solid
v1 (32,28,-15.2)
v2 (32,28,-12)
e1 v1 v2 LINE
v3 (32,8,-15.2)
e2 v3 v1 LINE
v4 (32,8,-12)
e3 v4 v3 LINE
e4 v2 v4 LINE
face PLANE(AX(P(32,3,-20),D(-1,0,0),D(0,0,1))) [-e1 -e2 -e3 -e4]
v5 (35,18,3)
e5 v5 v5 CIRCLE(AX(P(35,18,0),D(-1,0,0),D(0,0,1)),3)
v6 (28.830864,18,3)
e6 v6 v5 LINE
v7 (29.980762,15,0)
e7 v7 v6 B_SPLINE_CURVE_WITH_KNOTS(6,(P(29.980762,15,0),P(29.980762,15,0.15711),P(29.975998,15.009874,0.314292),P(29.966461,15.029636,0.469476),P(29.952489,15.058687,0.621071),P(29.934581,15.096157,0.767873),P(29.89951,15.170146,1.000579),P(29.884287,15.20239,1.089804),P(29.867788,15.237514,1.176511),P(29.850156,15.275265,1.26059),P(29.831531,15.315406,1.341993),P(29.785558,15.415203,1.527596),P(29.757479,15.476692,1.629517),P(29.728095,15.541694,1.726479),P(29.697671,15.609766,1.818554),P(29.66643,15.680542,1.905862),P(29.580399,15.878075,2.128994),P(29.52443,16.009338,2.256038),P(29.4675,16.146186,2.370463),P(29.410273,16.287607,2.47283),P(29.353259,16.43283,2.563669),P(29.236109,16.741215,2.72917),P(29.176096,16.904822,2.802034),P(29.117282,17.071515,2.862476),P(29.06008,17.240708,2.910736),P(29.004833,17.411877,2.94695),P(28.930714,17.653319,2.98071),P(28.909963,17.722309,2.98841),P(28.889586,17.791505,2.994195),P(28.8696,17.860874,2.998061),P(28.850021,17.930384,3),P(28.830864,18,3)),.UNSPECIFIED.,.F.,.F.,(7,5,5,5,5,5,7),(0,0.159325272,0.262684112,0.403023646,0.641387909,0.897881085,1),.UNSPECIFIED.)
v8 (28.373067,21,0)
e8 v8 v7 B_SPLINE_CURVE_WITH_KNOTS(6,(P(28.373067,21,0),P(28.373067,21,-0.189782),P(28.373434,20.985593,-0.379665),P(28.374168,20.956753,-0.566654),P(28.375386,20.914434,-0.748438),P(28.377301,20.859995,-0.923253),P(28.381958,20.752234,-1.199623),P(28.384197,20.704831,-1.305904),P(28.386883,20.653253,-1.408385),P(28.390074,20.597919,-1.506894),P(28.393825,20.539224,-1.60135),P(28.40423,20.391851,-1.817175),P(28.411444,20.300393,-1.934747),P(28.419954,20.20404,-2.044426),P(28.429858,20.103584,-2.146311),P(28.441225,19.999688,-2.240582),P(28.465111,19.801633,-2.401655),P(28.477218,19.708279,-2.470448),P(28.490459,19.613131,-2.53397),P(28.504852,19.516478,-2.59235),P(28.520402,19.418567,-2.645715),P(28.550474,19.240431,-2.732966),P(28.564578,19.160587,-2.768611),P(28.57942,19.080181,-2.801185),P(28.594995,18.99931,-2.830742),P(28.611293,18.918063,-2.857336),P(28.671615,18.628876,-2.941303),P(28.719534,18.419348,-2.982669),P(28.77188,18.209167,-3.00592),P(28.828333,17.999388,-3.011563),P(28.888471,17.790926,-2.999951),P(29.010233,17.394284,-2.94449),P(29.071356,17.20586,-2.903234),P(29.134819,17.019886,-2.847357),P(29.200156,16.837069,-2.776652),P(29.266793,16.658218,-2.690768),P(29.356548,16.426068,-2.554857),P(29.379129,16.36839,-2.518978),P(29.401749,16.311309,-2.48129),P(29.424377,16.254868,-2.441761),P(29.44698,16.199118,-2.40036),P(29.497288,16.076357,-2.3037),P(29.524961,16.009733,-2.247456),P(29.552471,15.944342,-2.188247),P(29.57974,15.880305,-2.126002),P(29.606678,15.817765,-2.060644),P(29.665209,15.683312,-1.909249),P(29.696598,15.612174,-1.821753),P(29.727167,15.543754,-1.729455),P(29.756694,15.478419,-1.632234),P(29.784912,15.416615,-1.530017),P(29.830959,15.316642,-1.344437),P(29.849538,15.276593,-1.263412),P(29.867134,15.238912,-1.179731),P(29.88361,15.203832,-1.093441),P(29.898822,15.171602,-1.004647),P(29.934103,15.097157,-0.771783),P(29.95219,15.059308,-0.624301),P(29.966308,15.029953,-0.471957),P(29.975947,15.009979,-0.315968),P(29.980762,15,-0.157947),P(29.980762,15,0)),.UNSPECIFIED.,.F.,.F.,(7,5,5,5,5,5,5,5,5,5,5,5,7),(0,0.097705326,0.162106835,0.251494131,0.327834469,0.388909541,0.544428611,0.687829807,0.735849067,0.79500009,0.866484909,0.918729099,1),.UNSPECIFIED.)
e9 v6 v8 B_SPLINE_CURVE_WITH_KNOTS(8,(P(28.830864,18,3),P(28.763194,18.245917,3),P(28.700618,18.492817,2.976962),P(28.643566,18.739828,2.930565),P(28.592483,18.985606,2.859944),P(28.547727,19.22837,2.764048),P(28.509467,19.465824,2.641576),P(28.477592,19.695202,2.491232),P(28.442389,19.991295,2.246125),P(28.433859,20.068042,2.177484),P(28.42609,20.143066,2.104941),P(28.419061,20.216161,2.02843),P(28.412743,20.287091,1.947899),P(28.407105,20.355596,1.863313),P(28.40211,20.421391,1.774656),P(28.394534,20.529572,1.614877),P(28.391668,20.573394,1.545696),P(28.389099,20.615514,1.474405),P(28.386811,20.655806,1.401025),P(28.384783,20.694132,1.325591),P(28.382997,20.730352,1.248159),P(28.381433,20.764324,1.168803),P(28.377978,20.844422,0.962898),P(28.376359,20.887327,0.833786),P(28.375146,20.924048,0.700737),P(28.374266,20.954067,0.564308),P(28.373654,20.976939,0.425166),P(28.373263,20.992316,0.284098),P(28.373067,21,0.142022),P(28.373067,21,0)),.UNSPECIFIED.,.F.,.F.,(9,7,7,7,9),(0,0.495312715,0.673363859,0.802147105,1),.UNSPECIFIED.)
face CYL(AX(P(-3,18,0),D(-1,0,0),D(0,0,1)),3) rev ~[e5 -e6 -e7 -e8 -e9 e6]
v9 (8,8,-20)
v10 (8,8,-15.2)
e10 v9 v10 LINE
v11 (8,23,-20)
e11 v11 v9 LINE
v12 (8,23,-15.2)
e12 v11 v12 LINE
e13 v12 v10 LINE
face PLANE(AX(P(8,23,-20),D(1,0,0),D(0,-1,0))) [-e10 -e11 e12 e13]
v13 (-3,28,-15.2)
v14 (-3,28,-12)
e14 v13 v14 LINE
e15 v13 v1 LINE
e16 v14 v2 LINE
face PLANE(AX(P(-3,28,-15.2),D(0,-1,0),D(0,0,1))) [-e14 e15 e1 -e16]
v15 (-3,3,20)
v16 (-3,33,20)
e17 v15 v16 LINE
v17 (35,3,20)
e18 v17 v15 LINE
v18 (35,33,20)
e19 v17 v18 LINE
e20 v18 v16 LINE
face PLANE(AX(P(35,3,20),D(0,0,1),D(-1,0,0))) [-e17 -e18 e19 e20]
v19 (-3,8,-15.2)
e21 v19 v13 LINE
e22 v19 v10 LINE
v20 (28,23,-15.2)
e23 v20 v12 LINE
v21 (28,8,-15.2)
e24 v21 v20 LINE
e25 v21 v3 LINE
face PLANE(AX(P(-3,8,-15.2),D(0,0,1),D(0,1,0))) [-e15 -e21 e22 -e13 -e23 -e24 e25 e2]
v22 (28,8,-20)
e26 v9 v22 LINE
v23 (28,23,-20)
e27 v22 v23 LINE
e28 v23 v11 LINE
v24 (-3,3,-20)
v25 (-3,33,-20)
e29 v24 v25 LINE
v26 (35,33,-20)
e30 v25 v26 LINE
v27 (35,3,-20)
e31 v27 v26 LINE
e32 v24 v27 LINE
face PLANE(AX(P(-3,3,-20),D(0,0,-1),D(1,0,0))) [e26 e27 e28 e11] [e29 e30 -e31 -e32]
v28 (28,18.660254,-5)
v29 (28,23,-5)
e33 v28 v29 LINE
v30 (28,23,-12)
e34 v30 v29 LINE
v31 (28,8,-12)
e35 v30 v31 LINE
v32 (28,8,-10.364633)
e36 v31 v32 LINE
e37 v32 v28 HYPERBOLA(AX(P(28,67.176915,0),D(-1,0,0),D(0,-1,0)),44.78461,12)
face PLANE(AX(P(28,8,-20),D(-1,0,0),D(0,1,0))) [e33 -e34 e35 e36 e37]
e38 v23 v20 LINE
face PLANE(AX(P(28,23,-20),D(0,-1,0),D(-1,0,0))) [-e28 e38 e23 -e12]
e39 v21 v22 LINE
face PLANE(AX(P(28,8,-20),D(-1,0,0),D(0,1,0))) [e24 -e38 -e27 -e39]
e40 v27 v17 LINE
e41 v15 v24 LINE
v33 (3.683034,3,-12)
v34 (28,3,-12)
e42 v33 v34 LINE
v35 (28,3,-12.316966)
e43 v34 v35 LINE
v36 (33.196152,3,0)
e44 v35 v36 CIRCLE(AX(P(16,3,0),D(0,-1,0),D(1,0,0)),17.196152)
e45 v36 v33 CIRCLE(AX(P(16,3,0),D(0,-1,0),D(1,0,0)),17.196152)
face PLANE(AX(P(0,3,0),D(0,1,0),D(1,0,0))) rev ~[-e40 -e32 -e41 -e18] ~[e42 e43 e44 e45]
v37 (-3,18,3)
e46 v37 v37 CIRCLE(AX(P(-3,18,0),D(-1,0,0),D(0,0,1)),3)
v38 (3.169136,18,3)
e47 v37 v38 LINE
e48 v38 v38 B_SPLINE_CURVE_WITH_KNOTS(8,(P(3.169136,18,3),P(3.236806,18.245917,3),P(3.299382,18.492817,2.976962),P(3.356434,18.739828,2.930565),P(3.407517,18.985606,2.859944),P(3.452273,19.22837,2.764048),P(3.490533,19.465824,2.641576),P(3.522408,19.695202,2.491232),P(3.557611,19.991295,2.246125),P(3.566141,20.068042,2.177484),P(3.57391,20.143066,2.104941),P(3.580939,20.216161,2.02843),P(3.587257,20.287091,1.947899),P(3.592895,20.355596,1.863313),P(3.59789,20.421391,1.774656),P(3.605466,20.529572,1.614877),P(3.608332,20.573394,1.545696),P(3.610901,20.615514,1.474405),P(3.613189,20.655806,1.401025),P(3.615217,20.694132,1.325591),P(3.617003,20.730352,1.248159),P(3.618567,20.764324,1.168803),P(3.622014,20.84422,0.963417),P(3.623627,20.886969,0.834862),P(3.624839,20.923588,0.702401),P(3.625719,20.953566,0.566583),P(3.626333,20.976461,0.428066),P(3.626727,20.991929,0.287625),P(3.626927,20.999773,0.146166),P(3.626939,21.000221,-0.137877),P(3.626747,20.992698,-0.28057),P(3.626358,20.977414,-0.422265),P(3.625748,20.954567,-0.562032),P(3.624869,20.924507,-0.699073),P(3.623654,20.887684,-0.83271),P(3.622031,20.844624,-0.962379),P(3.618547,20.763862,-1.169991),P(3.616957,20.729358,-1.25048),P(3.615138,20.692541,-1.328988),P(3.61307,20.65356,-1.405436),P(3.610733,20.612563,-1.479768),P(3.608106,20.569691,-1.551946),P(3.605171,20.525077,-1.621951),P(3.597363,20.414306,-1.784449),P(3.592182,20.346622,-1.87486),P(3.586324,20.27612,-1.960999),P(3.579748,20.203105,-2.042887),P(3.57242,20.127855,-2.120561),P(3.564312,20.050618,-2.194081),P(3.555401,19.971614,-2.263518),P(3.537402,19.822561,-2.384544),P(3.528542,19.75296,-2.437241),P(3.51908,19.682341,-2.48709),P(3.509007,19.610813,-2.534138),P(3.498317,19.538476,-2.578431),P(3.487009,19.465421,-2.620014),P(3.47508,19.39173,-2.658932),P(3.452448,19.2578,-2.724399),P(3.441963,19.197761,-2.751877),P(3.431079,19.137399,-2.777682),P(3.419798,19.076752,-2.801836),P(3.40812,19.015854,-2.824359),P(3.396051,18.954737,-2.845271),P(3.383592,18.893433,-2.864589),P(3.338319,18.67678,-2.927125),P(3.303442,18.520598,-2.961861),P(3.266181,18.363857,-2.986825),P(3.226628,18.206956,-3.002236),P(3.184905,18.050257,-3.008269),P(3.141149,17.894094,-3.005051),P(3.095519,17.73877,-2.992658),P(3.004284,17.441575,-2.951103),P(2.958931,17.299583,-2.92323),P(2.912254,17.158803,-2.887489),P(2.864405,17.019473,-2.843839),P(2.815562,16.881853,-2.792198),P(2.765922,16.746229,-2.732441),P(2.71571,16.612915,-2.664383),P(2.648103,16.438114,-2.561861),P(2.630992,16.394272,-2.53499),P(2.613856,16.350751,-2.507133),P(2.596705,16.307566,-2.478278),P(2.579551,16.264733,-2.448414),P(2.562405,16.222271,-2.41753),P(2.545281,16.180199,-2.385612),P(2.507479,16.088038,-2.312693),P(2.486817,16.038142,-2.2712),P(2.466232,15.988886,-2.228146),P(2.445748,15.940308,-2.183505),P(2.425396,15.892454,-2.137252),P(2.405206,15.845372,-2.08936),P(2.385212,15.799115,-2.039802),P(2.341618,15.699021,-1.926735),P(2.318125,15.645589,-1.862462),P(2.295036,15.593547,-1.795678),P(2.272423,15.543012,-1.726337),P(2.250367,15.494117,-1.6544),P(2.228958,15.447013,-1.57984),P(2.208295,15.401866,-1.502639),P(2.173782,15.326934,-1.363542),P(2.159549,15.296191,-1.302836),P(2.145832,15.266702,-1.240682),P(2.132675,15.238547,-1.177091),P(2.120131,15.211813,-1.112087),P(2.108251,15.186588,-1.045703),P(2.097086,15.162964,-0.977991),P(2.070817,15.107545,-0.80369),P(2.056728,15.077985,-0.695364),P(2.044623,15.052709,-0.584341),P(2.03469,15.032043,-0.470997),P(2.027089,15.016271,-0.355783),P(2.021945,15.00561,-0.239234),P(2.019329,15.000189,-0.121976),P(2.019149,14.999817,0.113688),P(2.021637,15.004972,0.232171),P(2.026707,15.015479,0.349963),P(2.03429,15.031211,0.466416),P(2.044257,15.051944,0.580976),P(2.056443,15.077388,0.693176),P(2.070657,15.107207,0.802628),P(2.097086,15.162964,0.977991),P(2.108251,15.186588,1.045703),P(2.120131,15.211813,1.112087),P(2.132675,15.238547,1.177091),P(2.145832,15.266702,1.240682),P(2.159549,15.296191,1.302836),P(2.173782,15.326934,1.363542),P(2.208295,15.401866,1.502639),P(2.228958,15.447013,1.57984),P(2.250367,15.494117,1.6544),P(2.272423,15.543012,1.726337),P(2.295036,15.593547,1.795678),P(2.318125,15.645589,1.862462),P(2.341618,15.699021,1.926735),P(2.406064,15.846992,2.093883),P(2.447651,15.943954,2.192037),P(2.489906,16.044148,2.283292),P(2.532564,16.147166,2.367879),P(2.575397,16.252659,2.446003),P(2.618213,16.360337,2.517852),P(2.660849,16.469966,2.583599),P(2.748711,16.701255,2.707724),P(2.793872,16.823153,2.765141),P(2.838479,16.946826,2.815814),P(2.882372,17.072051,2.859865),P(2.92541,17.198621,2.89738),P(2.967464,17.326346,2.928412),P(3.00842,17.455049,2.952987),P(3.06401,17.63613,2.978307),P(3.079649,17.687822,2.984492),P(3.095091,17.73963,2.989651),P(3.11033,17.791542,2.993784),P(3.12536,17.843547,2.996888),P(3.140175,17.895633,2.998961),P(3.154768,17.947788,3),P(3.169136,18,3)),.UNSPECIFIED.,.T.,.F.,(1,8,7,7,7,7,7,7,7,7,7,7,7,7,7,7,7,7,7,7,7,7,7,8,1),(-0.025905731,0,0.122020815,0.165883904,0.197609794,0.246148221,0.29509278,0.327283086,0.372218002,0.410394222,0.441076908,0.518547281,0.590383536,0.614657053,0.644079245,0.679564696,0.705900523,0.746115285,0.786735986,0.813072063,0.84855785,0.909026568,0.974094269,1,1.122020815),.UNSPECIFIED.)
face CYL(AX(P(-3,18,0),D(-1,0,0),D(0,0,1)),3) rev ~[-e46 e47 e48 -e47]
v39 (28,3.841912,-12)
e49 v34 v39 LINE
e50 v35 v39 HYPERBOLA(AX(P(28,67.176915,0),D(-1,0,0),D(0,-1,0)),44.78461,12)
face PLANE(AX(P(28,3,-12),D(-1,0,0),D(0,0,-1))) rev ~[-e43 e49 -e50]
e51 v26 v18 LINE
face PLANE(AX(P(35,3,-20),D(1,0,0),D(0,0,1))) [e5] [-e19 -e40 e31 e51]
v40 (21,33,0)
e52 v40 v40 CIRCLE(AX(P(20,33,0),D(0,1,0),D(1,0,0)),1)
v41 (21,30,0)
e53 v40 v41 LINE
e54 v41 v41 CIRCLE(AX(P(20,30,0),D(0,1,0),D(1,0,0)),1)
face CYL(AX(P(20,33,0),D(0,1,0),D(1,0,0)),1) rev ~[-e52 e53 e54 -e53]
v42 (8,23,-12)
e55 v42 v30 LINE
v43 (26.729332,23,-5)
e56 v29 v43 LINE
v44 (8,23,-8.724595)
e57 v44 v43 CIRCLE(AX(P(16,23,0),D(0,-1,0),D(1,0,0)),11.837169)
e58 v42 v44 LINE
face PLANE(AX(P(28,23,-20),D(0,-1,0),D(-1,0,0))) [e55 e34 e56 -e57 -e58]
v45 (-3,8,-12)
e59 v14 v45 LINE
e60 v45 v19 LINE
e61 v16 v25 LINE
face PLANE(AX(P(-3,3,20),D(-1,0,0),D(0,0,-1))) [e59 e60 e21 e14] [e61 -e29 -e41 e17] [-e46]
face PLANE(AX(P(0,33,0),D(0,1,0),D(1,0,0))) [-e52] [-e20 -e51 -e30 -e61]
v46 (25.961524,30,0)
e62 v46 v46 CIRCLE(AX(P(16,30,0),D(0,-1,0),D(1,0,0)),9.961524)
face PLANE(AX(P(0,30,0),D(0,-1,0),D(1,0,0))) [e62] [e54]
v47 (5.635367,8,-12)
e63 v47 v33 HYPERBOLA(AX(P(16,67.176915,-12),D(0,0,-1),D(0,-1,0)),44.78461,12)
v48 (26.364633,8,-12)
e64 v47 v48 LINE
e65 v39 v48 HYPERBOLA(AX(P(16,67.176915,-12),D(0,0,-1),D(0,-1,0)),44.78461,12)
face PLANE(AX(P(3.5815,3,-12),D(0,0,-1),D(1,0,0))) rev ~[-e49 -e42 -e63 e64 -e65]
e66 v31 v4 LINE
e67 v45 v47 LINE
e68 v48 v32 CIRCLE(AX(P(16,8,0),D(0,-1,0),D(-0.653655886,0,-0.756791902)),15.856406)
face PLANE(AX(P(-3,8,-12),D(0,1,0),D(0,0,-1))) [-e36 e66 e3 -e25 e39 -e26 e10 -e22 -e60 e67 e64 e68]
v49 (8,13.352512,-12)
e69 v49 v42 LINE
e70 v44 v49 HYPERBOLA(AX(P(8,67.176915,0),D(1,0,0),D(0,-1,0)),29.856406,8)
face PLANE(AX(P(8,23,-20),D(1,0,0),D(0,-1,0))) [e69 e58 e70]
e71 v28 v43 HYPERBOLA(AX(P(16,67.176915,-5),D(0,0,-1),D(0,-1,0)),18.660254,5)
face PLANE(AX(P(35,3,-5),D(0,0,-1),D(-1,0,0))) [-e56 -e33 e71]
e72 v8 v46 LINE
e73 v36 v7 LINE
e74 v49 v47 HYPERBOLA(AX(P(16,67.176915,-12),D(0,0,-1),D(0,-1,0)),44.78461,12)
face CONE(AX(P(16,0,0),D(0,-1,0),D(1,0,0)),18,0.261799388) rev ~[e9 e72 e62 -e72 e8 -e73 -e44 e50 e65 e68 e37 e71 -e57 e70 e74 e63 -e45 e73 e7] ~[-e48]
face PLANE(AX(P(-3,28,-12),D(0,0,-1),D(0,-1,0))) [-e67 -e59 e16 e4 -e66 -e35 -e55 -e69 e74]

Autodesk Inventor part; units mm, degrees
ref_plane "YZ Plane" through (0, 0, 0) normal (1, 0, 0) x (0, 1, 0)
ref_plane "XZ Plane" through (0, 0, 0) normal (0, 1, 0) x (-1, 0, 0)
ref_plane "XY Plane" through (0, 0, 0) normal (0, 0, 1) x (1, 0, 0)
ref_plane "Work Plane13" through (0, 3, 0) normal (0, 1, 0) x (1, 0, 0)
sketch "Sketch45" plane through (0, 3, 0) normal (0, 1, 0) x (1, 0, 0)
  line L0 (35, -20) -> (-3, -20)
  line L1 (-3, -20) -> (-3, 20)
  line L2 (-3, 20) -> (35, 20)
  line L3 (35, 20) -> (35, -20)
  point P0 (0, 0)
  dimension "d142" = 38
  dimension "d143" = 40
extrude "Extrusion34" add sketch "Sketch45" along normal blind 30
sketch "Sketch46" plane through (0, 33, 0) normal (0, 1, 0) x (1, 0, 0)
  point P0 (0, 0)
ref_plane "Work Plane11" through (0, 0, 0) normal (0, -1, 0) x (1, 0, 0)
sketch "Sketch47" plane through (0, 0, 0) normal (0, -1, 0) x (1, 0, 0)
  circle A0 centre (16, 0) radius 18
  point P0 (0, 0)
  dimension "d146" = 36
extrude "Extrusion35" cut sketch "Sketch47" against normal blind 30 draft -15
sketch "Sketch48" plane through (0, 33, 0) normal (0, 1, 0) x (1, 0, 0)
  point P0 (0, 0)
sketch "Sketch49" plane through (0, 33, 0) normal (0, 1, 0) x (1, 0, 0)
  circle A0 centre (20, 0) radius 1
  point P0 (0, 0)
  dimension "d149" = 2
extrude "Extrusion36" cut sketch "Sketch49" against normal through all
ref_plane "Work Plane7" through (35, 3, -20) normal (0, 0, -1) x (-1, 0, 0)
sketch "Sketch58" plane through (35, 3, -20) normal (0, 0, -1) x (-1, 0, 0)
  line L0 (7, 20) -> (27, 20)
  line L1 (27, 20) -> (27, 5)
  line L2 (27, 5) -> (7, 5)
  line L3 (7, 5) -> (7, 20)
  point P0 (35, -3)
  dimension "d156" = 20
  dimension "d157" = 15
extrude "Extrusion38" cut sketch "Sketch58" against normal blind 15
ref_plane "Work Plane4" through (-3, 3, -20) normal (-1, 0, 0) x (0, 0, 1)
sketch "Sketch59" plane through (-3, 3, -20) normal (-1, 0, 0) x (0, 0, 1)
  line L0 (4.8, 25) -> (8, 25)
  line L1 (8, 25) -> (8, 5)
  line L2 (8, 5) -> (4.8, 5)
  line L3 (4.8, 5) -> (4.8, 25)
  point P0 (20, -3)
  dimension "d160" = 3.2
  dimension "d161" = 20
extrude "Extrusion39" cut sketch "Sketch59" against normal blind 35
ref_plane "Work Plane1" through (0, 3, 0) normal (0, 1, 0) x (1, 0, 0)
ref_plane "Work Plane6" through (0, 23, 0) normal (0, 1, 0) x (1, 0, 0)
sketch "Sketch62" plane through (-3, 3, -20) normal (-1, 0, 0) x (0, 0, 1)
  circle A0 centre (20, 15) radius 3
  point P0 (20, -3)
  dimension "d172" = 6
extrude "Extrusion42" cut sketch "Sketch62" against normal through all
sketch "Sketch65" plane through (0, 3, 0) normal (0, -1, 0) x (1, 0, 0)
  line L0 (-3, -12) -> (32, -12) projected
  line L1 (28, -20) -> (28, -15.2) projected
  line L2 (3.5815, -12) -> (28, -12)
  line L3 (28, -12) -> (28, -17.2375)
  line L4 (28, -17.2375) -> (3.5815, -17.2375)
  line L5 (3.5815, -17.2375) -> (3.5815, -12)
  point P0 (0, 0)
extrude "Extrusion44" add sketch "Sketch65" against normal blind 5
properties part number "liquid port_only_v06"
